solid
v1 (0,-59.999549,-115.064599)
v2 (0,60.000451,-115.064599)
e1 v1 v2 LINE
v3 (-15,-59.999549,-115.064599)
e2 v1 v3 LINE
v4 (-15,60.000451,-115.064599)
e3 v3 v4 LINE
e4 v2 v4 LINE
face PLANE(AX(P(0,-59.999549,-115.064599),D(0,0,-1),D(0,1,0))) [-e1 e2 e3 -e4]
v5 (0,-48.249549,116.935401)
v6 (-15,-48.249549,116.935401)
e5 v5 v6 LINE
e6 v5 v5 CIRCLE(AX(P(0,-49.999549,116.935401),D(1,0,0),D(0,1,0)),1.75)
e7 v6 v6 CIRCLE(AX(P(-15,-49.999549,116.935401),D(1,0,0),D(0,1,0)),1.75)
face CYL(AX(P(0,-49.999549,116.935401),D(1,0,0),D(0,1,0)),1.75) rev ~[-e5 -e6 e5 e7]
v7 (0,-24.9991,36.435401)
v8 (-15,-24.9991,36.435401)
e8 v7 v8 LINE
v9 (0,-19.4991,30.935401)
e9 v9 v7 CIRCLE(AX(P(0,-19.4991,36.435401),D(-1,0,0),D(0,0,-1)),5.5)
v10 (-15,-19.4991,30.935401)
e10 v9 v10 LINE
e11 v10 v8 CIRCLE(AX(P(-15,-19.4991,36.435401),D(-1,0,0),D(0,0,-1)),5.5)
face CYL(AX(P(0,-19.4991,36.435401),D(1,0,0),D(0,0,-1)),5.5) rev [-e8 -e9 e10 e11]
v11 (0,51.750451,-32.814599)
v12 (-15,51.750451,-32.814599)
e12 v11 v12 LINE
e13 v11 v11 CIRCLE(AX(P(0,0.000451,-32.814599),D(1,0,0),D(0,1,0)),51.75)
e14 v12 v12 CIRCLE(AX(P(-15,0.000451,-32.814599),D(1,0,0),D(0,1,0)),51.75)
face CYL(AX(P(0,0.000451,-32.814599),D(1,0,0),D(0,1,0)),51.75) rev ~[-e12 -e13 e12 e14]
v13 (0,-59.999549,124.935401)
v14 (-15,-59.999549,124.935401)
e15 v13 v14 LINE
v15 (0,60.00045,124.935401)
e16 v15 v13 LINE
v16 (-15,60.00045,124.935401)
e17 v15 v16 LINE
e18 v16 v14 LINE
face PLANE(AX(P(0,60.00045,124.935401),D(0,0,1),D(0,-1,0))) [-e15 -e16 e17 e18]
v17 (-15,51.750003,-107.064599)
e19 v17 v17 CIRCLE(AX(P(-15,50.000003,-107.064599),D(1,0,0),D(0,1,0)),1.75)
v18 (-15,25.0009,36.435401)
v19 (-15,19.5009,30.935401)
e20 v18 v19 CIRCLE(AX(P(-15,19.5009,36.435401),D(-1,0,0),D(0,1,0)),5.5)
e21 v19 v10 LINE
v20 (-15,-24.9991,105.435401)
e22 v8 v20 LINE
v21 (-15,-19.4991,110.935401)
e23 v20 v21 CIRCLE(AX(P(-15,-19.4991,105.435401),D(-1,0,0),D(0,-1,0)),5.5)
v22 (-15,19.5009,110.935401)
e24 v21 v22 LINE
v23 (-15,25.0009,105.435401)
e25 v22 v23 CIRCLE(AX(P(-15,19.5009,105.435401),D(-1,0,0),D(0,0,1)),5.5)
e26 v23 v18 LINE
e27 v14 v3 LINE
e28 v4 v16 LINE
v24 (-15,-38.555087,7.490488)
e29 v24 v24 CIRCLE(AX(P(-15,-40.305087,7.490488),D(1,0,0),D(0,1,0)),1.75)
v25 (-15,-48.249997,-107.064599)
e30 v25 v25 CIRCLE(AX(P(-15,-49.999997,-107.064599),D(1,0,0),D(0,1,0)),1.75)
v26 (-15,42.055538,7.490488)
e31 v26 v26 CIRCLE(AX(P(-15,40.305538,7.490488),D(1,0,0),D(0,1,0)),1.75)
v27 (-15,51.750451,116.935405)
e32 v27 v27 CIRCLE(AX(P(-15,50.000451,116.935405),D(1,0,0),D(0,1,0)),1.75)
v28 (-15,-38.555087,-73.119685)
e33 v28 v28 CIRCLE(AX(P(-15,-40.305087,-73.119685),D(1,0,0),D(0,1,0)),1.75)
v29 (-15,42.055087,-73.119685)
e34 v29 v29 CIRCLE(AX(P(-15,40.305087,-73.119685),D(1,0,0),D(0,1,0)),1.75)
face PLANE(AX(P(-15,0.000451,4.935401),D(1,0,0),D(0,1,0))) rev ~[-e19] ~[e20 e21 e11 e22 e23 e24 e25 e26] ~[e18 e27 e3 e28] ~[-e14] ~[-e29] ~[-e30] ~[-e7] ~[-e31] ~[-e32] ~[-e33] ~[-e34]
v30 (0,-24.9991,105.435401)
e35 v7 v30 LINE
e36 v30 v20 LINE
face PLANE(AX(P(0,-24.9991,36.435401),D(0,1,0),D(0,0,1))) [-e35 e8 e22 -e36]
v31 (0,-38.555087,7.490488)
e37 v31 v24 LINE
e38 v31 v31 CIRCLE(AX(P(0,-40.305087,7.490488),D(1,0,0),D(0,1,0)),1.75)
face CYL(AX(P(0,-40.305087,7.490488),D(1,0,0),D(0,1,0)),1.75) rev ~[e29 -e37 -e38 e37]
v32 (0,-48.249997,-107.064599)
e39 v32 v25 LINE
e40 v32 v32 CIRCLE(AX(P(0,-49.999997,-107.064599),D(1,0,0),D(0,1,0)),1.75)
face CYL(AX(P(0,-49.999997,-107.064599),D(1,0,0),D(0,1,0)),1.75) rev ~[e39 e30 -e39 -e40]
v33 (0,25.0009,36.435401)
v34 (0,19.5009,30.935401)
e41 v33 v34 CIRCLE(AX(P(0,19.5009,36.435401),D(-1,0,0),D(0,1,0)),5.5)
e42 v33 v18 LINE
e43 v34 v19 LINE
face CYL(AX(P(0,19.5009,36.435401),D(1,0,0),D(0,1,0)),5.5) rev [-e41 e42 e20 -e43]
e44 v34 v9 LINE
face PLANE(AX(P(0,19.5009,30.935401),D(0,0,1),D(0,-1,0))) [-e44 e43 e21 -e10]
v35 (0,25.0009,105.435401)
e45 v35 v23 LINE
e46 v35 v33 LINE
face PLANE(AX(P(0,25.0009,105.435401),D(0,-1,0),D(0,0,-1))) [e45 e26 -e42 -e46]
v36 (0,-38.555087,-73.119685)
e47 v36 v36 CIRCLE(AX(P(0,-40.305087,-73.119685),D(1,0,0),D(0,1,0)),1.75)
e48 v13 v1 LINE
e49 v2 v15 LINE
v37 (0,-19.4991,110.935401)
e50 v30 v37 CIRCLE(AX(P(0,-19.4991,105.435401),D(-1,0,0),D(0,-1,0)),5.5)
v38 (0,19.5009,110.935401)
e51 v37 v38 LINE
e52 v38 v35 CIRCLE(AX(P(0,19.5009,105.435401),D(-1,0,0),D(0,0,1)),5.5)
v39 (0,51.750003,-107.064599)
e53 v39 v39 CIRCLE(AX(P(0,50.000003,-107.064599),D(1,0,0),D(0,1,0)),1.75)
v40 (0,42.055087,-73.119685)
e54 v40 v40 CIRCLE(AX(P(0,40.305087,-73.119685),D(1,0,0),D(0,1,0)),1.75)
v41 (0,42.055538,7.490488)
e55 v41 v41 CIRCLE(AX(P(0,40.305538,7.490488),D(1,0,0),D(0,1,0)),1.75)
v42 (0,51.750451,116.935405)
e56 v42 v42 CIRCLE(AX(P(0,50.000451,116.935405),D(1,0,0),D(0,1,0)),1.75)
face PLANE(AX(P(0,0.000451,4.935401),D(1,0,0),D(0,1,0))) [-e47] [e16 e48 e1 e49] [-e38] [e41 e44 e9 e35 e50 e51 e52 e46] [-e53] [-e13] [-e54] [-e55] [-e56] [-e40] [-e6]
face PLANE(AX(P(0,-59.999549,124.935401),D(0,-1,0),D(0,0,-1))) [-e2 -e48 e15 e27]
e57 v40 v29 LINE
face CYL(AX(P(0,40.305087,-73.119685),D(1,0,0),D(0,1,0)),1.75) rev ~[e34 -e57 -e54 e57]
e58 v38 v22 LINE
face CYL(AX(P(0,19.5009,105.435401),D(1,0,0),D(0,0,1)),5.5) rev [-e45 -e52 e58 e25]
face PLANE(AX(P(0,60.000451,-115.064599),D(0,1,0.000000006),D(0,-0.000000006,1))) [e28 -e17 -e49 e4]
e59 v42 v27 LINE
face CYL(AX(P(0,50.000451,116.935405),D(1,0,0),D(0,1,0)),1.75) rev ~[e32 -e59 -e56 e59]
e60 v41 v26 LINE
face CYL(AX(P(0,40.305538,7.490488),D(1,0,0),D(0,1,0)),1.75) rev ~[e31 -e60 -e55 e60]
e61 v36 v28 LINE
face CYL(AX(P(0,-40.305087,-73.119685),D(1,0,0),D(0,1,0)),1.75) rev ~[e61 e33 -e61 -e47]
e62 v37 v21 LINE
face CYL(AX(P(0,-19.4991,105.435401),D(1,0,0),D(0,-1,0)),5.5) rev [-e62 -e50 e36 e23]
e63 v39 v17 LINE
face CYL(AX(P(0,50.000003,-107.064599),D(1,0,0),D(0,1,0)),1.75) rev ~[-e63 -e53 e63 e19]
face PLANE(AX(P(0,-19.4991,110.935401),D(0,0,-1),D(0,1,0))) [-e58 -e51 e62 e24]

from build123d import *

# Parameters (mm, degrees)
F0_R     = 1.75
F0_R_2   = 51.75
F1_DEPTH = 15


# Not quite as in the source:
# - ends of sketch curves that miss each other by under 0.0002 mm in the source are joined


with BuildPart() as f1:
    # F0 (on Right) → F1 (new body)
    with BuildSketch(Plane.YZ):
        Polygon((-59.9995488366, -115.0645988089), (60.0004511634, -115.0645988089), (60.0004498223, 124.9354011911), (0.0004538456, 124.9354011911), (-59.9995488366, 124.9354011911), align=None)
        with Locations((-49.9999973178, -107.0645988089)):
            Circle(F0_R, mode=Mode.SUBTRACT)
        with Locations((-40.3050865276, -73.1196853366)):
            Circle(F0_R, mode=Mode.SUBTRACT)
        with Locations((0.0004511634, -32.8145988089)):
            Circle(F0_R_2, mode=Mode.SUBTRACT)
        with Locations((50.0000026822, -107.0645988089)):
            Circle(F0_R, mode=Mode.SUBTRACT)
        with Locations((40.3050865276, -73.1196853366)):
            Circle(F0_R, mode=Mode.SUBTRACT)
        with Locations((-40.3050865276, 7.4904877187)):
            Circle(F0_R, mode=Mode.SUBTRACT)
        with Locations((-49.9995488366, 116.9354011911)):
            Circle(F0_R, mode=Mode.SUBTRACT)
        with Locations((40.305537691, 7.4904877187)):
            Circle(F0_R, mode=Mode.SUBTRACT)
        with BuildLine():
            Line((-19.4991003554, 110.9354010969), (19.5008996446, 110.9354010969))
            ThreePointArc((19.5008996446, 110.9354010969), (23.3899869411, 109.3244883935), (25.0008996446, 105.4354010969))
            Line((25.0008996446, 105.4354010969), (25.0008996446, 36.4354010969))
            ThreePointArc((25.0008996446, 36.4354010969), (23.3899869411, 32.5463138004), (19.5008996446, 30.9354010969))
            Line((19.5008996446, 30.9354010969), (-19.4991003554, 30.9354010969))
            ThreePointArc((-19.4991003554, 30.9354010969), (-23.3881876519, 32.5463138004), (-24.9991003554, 36.4354010969))
            Line((-24.9991003554, 36.4354010969), (-24.9991003554, 105.4354010969))
            ThreePointArc((-24.9991003554, 105.4354010969), (-23.3881876519, 109.3244883935), (-19.4991003554, 110.9354010969))
        make_face(mode=Mode.SUBTRACT)
        with Locations((50.0004511634, 116.9354046481)):
            Circle(F0_R, mode=Mode.SUBTRACT)
    extrude(amount=-F1_DEPTH)


solid = f1.part
